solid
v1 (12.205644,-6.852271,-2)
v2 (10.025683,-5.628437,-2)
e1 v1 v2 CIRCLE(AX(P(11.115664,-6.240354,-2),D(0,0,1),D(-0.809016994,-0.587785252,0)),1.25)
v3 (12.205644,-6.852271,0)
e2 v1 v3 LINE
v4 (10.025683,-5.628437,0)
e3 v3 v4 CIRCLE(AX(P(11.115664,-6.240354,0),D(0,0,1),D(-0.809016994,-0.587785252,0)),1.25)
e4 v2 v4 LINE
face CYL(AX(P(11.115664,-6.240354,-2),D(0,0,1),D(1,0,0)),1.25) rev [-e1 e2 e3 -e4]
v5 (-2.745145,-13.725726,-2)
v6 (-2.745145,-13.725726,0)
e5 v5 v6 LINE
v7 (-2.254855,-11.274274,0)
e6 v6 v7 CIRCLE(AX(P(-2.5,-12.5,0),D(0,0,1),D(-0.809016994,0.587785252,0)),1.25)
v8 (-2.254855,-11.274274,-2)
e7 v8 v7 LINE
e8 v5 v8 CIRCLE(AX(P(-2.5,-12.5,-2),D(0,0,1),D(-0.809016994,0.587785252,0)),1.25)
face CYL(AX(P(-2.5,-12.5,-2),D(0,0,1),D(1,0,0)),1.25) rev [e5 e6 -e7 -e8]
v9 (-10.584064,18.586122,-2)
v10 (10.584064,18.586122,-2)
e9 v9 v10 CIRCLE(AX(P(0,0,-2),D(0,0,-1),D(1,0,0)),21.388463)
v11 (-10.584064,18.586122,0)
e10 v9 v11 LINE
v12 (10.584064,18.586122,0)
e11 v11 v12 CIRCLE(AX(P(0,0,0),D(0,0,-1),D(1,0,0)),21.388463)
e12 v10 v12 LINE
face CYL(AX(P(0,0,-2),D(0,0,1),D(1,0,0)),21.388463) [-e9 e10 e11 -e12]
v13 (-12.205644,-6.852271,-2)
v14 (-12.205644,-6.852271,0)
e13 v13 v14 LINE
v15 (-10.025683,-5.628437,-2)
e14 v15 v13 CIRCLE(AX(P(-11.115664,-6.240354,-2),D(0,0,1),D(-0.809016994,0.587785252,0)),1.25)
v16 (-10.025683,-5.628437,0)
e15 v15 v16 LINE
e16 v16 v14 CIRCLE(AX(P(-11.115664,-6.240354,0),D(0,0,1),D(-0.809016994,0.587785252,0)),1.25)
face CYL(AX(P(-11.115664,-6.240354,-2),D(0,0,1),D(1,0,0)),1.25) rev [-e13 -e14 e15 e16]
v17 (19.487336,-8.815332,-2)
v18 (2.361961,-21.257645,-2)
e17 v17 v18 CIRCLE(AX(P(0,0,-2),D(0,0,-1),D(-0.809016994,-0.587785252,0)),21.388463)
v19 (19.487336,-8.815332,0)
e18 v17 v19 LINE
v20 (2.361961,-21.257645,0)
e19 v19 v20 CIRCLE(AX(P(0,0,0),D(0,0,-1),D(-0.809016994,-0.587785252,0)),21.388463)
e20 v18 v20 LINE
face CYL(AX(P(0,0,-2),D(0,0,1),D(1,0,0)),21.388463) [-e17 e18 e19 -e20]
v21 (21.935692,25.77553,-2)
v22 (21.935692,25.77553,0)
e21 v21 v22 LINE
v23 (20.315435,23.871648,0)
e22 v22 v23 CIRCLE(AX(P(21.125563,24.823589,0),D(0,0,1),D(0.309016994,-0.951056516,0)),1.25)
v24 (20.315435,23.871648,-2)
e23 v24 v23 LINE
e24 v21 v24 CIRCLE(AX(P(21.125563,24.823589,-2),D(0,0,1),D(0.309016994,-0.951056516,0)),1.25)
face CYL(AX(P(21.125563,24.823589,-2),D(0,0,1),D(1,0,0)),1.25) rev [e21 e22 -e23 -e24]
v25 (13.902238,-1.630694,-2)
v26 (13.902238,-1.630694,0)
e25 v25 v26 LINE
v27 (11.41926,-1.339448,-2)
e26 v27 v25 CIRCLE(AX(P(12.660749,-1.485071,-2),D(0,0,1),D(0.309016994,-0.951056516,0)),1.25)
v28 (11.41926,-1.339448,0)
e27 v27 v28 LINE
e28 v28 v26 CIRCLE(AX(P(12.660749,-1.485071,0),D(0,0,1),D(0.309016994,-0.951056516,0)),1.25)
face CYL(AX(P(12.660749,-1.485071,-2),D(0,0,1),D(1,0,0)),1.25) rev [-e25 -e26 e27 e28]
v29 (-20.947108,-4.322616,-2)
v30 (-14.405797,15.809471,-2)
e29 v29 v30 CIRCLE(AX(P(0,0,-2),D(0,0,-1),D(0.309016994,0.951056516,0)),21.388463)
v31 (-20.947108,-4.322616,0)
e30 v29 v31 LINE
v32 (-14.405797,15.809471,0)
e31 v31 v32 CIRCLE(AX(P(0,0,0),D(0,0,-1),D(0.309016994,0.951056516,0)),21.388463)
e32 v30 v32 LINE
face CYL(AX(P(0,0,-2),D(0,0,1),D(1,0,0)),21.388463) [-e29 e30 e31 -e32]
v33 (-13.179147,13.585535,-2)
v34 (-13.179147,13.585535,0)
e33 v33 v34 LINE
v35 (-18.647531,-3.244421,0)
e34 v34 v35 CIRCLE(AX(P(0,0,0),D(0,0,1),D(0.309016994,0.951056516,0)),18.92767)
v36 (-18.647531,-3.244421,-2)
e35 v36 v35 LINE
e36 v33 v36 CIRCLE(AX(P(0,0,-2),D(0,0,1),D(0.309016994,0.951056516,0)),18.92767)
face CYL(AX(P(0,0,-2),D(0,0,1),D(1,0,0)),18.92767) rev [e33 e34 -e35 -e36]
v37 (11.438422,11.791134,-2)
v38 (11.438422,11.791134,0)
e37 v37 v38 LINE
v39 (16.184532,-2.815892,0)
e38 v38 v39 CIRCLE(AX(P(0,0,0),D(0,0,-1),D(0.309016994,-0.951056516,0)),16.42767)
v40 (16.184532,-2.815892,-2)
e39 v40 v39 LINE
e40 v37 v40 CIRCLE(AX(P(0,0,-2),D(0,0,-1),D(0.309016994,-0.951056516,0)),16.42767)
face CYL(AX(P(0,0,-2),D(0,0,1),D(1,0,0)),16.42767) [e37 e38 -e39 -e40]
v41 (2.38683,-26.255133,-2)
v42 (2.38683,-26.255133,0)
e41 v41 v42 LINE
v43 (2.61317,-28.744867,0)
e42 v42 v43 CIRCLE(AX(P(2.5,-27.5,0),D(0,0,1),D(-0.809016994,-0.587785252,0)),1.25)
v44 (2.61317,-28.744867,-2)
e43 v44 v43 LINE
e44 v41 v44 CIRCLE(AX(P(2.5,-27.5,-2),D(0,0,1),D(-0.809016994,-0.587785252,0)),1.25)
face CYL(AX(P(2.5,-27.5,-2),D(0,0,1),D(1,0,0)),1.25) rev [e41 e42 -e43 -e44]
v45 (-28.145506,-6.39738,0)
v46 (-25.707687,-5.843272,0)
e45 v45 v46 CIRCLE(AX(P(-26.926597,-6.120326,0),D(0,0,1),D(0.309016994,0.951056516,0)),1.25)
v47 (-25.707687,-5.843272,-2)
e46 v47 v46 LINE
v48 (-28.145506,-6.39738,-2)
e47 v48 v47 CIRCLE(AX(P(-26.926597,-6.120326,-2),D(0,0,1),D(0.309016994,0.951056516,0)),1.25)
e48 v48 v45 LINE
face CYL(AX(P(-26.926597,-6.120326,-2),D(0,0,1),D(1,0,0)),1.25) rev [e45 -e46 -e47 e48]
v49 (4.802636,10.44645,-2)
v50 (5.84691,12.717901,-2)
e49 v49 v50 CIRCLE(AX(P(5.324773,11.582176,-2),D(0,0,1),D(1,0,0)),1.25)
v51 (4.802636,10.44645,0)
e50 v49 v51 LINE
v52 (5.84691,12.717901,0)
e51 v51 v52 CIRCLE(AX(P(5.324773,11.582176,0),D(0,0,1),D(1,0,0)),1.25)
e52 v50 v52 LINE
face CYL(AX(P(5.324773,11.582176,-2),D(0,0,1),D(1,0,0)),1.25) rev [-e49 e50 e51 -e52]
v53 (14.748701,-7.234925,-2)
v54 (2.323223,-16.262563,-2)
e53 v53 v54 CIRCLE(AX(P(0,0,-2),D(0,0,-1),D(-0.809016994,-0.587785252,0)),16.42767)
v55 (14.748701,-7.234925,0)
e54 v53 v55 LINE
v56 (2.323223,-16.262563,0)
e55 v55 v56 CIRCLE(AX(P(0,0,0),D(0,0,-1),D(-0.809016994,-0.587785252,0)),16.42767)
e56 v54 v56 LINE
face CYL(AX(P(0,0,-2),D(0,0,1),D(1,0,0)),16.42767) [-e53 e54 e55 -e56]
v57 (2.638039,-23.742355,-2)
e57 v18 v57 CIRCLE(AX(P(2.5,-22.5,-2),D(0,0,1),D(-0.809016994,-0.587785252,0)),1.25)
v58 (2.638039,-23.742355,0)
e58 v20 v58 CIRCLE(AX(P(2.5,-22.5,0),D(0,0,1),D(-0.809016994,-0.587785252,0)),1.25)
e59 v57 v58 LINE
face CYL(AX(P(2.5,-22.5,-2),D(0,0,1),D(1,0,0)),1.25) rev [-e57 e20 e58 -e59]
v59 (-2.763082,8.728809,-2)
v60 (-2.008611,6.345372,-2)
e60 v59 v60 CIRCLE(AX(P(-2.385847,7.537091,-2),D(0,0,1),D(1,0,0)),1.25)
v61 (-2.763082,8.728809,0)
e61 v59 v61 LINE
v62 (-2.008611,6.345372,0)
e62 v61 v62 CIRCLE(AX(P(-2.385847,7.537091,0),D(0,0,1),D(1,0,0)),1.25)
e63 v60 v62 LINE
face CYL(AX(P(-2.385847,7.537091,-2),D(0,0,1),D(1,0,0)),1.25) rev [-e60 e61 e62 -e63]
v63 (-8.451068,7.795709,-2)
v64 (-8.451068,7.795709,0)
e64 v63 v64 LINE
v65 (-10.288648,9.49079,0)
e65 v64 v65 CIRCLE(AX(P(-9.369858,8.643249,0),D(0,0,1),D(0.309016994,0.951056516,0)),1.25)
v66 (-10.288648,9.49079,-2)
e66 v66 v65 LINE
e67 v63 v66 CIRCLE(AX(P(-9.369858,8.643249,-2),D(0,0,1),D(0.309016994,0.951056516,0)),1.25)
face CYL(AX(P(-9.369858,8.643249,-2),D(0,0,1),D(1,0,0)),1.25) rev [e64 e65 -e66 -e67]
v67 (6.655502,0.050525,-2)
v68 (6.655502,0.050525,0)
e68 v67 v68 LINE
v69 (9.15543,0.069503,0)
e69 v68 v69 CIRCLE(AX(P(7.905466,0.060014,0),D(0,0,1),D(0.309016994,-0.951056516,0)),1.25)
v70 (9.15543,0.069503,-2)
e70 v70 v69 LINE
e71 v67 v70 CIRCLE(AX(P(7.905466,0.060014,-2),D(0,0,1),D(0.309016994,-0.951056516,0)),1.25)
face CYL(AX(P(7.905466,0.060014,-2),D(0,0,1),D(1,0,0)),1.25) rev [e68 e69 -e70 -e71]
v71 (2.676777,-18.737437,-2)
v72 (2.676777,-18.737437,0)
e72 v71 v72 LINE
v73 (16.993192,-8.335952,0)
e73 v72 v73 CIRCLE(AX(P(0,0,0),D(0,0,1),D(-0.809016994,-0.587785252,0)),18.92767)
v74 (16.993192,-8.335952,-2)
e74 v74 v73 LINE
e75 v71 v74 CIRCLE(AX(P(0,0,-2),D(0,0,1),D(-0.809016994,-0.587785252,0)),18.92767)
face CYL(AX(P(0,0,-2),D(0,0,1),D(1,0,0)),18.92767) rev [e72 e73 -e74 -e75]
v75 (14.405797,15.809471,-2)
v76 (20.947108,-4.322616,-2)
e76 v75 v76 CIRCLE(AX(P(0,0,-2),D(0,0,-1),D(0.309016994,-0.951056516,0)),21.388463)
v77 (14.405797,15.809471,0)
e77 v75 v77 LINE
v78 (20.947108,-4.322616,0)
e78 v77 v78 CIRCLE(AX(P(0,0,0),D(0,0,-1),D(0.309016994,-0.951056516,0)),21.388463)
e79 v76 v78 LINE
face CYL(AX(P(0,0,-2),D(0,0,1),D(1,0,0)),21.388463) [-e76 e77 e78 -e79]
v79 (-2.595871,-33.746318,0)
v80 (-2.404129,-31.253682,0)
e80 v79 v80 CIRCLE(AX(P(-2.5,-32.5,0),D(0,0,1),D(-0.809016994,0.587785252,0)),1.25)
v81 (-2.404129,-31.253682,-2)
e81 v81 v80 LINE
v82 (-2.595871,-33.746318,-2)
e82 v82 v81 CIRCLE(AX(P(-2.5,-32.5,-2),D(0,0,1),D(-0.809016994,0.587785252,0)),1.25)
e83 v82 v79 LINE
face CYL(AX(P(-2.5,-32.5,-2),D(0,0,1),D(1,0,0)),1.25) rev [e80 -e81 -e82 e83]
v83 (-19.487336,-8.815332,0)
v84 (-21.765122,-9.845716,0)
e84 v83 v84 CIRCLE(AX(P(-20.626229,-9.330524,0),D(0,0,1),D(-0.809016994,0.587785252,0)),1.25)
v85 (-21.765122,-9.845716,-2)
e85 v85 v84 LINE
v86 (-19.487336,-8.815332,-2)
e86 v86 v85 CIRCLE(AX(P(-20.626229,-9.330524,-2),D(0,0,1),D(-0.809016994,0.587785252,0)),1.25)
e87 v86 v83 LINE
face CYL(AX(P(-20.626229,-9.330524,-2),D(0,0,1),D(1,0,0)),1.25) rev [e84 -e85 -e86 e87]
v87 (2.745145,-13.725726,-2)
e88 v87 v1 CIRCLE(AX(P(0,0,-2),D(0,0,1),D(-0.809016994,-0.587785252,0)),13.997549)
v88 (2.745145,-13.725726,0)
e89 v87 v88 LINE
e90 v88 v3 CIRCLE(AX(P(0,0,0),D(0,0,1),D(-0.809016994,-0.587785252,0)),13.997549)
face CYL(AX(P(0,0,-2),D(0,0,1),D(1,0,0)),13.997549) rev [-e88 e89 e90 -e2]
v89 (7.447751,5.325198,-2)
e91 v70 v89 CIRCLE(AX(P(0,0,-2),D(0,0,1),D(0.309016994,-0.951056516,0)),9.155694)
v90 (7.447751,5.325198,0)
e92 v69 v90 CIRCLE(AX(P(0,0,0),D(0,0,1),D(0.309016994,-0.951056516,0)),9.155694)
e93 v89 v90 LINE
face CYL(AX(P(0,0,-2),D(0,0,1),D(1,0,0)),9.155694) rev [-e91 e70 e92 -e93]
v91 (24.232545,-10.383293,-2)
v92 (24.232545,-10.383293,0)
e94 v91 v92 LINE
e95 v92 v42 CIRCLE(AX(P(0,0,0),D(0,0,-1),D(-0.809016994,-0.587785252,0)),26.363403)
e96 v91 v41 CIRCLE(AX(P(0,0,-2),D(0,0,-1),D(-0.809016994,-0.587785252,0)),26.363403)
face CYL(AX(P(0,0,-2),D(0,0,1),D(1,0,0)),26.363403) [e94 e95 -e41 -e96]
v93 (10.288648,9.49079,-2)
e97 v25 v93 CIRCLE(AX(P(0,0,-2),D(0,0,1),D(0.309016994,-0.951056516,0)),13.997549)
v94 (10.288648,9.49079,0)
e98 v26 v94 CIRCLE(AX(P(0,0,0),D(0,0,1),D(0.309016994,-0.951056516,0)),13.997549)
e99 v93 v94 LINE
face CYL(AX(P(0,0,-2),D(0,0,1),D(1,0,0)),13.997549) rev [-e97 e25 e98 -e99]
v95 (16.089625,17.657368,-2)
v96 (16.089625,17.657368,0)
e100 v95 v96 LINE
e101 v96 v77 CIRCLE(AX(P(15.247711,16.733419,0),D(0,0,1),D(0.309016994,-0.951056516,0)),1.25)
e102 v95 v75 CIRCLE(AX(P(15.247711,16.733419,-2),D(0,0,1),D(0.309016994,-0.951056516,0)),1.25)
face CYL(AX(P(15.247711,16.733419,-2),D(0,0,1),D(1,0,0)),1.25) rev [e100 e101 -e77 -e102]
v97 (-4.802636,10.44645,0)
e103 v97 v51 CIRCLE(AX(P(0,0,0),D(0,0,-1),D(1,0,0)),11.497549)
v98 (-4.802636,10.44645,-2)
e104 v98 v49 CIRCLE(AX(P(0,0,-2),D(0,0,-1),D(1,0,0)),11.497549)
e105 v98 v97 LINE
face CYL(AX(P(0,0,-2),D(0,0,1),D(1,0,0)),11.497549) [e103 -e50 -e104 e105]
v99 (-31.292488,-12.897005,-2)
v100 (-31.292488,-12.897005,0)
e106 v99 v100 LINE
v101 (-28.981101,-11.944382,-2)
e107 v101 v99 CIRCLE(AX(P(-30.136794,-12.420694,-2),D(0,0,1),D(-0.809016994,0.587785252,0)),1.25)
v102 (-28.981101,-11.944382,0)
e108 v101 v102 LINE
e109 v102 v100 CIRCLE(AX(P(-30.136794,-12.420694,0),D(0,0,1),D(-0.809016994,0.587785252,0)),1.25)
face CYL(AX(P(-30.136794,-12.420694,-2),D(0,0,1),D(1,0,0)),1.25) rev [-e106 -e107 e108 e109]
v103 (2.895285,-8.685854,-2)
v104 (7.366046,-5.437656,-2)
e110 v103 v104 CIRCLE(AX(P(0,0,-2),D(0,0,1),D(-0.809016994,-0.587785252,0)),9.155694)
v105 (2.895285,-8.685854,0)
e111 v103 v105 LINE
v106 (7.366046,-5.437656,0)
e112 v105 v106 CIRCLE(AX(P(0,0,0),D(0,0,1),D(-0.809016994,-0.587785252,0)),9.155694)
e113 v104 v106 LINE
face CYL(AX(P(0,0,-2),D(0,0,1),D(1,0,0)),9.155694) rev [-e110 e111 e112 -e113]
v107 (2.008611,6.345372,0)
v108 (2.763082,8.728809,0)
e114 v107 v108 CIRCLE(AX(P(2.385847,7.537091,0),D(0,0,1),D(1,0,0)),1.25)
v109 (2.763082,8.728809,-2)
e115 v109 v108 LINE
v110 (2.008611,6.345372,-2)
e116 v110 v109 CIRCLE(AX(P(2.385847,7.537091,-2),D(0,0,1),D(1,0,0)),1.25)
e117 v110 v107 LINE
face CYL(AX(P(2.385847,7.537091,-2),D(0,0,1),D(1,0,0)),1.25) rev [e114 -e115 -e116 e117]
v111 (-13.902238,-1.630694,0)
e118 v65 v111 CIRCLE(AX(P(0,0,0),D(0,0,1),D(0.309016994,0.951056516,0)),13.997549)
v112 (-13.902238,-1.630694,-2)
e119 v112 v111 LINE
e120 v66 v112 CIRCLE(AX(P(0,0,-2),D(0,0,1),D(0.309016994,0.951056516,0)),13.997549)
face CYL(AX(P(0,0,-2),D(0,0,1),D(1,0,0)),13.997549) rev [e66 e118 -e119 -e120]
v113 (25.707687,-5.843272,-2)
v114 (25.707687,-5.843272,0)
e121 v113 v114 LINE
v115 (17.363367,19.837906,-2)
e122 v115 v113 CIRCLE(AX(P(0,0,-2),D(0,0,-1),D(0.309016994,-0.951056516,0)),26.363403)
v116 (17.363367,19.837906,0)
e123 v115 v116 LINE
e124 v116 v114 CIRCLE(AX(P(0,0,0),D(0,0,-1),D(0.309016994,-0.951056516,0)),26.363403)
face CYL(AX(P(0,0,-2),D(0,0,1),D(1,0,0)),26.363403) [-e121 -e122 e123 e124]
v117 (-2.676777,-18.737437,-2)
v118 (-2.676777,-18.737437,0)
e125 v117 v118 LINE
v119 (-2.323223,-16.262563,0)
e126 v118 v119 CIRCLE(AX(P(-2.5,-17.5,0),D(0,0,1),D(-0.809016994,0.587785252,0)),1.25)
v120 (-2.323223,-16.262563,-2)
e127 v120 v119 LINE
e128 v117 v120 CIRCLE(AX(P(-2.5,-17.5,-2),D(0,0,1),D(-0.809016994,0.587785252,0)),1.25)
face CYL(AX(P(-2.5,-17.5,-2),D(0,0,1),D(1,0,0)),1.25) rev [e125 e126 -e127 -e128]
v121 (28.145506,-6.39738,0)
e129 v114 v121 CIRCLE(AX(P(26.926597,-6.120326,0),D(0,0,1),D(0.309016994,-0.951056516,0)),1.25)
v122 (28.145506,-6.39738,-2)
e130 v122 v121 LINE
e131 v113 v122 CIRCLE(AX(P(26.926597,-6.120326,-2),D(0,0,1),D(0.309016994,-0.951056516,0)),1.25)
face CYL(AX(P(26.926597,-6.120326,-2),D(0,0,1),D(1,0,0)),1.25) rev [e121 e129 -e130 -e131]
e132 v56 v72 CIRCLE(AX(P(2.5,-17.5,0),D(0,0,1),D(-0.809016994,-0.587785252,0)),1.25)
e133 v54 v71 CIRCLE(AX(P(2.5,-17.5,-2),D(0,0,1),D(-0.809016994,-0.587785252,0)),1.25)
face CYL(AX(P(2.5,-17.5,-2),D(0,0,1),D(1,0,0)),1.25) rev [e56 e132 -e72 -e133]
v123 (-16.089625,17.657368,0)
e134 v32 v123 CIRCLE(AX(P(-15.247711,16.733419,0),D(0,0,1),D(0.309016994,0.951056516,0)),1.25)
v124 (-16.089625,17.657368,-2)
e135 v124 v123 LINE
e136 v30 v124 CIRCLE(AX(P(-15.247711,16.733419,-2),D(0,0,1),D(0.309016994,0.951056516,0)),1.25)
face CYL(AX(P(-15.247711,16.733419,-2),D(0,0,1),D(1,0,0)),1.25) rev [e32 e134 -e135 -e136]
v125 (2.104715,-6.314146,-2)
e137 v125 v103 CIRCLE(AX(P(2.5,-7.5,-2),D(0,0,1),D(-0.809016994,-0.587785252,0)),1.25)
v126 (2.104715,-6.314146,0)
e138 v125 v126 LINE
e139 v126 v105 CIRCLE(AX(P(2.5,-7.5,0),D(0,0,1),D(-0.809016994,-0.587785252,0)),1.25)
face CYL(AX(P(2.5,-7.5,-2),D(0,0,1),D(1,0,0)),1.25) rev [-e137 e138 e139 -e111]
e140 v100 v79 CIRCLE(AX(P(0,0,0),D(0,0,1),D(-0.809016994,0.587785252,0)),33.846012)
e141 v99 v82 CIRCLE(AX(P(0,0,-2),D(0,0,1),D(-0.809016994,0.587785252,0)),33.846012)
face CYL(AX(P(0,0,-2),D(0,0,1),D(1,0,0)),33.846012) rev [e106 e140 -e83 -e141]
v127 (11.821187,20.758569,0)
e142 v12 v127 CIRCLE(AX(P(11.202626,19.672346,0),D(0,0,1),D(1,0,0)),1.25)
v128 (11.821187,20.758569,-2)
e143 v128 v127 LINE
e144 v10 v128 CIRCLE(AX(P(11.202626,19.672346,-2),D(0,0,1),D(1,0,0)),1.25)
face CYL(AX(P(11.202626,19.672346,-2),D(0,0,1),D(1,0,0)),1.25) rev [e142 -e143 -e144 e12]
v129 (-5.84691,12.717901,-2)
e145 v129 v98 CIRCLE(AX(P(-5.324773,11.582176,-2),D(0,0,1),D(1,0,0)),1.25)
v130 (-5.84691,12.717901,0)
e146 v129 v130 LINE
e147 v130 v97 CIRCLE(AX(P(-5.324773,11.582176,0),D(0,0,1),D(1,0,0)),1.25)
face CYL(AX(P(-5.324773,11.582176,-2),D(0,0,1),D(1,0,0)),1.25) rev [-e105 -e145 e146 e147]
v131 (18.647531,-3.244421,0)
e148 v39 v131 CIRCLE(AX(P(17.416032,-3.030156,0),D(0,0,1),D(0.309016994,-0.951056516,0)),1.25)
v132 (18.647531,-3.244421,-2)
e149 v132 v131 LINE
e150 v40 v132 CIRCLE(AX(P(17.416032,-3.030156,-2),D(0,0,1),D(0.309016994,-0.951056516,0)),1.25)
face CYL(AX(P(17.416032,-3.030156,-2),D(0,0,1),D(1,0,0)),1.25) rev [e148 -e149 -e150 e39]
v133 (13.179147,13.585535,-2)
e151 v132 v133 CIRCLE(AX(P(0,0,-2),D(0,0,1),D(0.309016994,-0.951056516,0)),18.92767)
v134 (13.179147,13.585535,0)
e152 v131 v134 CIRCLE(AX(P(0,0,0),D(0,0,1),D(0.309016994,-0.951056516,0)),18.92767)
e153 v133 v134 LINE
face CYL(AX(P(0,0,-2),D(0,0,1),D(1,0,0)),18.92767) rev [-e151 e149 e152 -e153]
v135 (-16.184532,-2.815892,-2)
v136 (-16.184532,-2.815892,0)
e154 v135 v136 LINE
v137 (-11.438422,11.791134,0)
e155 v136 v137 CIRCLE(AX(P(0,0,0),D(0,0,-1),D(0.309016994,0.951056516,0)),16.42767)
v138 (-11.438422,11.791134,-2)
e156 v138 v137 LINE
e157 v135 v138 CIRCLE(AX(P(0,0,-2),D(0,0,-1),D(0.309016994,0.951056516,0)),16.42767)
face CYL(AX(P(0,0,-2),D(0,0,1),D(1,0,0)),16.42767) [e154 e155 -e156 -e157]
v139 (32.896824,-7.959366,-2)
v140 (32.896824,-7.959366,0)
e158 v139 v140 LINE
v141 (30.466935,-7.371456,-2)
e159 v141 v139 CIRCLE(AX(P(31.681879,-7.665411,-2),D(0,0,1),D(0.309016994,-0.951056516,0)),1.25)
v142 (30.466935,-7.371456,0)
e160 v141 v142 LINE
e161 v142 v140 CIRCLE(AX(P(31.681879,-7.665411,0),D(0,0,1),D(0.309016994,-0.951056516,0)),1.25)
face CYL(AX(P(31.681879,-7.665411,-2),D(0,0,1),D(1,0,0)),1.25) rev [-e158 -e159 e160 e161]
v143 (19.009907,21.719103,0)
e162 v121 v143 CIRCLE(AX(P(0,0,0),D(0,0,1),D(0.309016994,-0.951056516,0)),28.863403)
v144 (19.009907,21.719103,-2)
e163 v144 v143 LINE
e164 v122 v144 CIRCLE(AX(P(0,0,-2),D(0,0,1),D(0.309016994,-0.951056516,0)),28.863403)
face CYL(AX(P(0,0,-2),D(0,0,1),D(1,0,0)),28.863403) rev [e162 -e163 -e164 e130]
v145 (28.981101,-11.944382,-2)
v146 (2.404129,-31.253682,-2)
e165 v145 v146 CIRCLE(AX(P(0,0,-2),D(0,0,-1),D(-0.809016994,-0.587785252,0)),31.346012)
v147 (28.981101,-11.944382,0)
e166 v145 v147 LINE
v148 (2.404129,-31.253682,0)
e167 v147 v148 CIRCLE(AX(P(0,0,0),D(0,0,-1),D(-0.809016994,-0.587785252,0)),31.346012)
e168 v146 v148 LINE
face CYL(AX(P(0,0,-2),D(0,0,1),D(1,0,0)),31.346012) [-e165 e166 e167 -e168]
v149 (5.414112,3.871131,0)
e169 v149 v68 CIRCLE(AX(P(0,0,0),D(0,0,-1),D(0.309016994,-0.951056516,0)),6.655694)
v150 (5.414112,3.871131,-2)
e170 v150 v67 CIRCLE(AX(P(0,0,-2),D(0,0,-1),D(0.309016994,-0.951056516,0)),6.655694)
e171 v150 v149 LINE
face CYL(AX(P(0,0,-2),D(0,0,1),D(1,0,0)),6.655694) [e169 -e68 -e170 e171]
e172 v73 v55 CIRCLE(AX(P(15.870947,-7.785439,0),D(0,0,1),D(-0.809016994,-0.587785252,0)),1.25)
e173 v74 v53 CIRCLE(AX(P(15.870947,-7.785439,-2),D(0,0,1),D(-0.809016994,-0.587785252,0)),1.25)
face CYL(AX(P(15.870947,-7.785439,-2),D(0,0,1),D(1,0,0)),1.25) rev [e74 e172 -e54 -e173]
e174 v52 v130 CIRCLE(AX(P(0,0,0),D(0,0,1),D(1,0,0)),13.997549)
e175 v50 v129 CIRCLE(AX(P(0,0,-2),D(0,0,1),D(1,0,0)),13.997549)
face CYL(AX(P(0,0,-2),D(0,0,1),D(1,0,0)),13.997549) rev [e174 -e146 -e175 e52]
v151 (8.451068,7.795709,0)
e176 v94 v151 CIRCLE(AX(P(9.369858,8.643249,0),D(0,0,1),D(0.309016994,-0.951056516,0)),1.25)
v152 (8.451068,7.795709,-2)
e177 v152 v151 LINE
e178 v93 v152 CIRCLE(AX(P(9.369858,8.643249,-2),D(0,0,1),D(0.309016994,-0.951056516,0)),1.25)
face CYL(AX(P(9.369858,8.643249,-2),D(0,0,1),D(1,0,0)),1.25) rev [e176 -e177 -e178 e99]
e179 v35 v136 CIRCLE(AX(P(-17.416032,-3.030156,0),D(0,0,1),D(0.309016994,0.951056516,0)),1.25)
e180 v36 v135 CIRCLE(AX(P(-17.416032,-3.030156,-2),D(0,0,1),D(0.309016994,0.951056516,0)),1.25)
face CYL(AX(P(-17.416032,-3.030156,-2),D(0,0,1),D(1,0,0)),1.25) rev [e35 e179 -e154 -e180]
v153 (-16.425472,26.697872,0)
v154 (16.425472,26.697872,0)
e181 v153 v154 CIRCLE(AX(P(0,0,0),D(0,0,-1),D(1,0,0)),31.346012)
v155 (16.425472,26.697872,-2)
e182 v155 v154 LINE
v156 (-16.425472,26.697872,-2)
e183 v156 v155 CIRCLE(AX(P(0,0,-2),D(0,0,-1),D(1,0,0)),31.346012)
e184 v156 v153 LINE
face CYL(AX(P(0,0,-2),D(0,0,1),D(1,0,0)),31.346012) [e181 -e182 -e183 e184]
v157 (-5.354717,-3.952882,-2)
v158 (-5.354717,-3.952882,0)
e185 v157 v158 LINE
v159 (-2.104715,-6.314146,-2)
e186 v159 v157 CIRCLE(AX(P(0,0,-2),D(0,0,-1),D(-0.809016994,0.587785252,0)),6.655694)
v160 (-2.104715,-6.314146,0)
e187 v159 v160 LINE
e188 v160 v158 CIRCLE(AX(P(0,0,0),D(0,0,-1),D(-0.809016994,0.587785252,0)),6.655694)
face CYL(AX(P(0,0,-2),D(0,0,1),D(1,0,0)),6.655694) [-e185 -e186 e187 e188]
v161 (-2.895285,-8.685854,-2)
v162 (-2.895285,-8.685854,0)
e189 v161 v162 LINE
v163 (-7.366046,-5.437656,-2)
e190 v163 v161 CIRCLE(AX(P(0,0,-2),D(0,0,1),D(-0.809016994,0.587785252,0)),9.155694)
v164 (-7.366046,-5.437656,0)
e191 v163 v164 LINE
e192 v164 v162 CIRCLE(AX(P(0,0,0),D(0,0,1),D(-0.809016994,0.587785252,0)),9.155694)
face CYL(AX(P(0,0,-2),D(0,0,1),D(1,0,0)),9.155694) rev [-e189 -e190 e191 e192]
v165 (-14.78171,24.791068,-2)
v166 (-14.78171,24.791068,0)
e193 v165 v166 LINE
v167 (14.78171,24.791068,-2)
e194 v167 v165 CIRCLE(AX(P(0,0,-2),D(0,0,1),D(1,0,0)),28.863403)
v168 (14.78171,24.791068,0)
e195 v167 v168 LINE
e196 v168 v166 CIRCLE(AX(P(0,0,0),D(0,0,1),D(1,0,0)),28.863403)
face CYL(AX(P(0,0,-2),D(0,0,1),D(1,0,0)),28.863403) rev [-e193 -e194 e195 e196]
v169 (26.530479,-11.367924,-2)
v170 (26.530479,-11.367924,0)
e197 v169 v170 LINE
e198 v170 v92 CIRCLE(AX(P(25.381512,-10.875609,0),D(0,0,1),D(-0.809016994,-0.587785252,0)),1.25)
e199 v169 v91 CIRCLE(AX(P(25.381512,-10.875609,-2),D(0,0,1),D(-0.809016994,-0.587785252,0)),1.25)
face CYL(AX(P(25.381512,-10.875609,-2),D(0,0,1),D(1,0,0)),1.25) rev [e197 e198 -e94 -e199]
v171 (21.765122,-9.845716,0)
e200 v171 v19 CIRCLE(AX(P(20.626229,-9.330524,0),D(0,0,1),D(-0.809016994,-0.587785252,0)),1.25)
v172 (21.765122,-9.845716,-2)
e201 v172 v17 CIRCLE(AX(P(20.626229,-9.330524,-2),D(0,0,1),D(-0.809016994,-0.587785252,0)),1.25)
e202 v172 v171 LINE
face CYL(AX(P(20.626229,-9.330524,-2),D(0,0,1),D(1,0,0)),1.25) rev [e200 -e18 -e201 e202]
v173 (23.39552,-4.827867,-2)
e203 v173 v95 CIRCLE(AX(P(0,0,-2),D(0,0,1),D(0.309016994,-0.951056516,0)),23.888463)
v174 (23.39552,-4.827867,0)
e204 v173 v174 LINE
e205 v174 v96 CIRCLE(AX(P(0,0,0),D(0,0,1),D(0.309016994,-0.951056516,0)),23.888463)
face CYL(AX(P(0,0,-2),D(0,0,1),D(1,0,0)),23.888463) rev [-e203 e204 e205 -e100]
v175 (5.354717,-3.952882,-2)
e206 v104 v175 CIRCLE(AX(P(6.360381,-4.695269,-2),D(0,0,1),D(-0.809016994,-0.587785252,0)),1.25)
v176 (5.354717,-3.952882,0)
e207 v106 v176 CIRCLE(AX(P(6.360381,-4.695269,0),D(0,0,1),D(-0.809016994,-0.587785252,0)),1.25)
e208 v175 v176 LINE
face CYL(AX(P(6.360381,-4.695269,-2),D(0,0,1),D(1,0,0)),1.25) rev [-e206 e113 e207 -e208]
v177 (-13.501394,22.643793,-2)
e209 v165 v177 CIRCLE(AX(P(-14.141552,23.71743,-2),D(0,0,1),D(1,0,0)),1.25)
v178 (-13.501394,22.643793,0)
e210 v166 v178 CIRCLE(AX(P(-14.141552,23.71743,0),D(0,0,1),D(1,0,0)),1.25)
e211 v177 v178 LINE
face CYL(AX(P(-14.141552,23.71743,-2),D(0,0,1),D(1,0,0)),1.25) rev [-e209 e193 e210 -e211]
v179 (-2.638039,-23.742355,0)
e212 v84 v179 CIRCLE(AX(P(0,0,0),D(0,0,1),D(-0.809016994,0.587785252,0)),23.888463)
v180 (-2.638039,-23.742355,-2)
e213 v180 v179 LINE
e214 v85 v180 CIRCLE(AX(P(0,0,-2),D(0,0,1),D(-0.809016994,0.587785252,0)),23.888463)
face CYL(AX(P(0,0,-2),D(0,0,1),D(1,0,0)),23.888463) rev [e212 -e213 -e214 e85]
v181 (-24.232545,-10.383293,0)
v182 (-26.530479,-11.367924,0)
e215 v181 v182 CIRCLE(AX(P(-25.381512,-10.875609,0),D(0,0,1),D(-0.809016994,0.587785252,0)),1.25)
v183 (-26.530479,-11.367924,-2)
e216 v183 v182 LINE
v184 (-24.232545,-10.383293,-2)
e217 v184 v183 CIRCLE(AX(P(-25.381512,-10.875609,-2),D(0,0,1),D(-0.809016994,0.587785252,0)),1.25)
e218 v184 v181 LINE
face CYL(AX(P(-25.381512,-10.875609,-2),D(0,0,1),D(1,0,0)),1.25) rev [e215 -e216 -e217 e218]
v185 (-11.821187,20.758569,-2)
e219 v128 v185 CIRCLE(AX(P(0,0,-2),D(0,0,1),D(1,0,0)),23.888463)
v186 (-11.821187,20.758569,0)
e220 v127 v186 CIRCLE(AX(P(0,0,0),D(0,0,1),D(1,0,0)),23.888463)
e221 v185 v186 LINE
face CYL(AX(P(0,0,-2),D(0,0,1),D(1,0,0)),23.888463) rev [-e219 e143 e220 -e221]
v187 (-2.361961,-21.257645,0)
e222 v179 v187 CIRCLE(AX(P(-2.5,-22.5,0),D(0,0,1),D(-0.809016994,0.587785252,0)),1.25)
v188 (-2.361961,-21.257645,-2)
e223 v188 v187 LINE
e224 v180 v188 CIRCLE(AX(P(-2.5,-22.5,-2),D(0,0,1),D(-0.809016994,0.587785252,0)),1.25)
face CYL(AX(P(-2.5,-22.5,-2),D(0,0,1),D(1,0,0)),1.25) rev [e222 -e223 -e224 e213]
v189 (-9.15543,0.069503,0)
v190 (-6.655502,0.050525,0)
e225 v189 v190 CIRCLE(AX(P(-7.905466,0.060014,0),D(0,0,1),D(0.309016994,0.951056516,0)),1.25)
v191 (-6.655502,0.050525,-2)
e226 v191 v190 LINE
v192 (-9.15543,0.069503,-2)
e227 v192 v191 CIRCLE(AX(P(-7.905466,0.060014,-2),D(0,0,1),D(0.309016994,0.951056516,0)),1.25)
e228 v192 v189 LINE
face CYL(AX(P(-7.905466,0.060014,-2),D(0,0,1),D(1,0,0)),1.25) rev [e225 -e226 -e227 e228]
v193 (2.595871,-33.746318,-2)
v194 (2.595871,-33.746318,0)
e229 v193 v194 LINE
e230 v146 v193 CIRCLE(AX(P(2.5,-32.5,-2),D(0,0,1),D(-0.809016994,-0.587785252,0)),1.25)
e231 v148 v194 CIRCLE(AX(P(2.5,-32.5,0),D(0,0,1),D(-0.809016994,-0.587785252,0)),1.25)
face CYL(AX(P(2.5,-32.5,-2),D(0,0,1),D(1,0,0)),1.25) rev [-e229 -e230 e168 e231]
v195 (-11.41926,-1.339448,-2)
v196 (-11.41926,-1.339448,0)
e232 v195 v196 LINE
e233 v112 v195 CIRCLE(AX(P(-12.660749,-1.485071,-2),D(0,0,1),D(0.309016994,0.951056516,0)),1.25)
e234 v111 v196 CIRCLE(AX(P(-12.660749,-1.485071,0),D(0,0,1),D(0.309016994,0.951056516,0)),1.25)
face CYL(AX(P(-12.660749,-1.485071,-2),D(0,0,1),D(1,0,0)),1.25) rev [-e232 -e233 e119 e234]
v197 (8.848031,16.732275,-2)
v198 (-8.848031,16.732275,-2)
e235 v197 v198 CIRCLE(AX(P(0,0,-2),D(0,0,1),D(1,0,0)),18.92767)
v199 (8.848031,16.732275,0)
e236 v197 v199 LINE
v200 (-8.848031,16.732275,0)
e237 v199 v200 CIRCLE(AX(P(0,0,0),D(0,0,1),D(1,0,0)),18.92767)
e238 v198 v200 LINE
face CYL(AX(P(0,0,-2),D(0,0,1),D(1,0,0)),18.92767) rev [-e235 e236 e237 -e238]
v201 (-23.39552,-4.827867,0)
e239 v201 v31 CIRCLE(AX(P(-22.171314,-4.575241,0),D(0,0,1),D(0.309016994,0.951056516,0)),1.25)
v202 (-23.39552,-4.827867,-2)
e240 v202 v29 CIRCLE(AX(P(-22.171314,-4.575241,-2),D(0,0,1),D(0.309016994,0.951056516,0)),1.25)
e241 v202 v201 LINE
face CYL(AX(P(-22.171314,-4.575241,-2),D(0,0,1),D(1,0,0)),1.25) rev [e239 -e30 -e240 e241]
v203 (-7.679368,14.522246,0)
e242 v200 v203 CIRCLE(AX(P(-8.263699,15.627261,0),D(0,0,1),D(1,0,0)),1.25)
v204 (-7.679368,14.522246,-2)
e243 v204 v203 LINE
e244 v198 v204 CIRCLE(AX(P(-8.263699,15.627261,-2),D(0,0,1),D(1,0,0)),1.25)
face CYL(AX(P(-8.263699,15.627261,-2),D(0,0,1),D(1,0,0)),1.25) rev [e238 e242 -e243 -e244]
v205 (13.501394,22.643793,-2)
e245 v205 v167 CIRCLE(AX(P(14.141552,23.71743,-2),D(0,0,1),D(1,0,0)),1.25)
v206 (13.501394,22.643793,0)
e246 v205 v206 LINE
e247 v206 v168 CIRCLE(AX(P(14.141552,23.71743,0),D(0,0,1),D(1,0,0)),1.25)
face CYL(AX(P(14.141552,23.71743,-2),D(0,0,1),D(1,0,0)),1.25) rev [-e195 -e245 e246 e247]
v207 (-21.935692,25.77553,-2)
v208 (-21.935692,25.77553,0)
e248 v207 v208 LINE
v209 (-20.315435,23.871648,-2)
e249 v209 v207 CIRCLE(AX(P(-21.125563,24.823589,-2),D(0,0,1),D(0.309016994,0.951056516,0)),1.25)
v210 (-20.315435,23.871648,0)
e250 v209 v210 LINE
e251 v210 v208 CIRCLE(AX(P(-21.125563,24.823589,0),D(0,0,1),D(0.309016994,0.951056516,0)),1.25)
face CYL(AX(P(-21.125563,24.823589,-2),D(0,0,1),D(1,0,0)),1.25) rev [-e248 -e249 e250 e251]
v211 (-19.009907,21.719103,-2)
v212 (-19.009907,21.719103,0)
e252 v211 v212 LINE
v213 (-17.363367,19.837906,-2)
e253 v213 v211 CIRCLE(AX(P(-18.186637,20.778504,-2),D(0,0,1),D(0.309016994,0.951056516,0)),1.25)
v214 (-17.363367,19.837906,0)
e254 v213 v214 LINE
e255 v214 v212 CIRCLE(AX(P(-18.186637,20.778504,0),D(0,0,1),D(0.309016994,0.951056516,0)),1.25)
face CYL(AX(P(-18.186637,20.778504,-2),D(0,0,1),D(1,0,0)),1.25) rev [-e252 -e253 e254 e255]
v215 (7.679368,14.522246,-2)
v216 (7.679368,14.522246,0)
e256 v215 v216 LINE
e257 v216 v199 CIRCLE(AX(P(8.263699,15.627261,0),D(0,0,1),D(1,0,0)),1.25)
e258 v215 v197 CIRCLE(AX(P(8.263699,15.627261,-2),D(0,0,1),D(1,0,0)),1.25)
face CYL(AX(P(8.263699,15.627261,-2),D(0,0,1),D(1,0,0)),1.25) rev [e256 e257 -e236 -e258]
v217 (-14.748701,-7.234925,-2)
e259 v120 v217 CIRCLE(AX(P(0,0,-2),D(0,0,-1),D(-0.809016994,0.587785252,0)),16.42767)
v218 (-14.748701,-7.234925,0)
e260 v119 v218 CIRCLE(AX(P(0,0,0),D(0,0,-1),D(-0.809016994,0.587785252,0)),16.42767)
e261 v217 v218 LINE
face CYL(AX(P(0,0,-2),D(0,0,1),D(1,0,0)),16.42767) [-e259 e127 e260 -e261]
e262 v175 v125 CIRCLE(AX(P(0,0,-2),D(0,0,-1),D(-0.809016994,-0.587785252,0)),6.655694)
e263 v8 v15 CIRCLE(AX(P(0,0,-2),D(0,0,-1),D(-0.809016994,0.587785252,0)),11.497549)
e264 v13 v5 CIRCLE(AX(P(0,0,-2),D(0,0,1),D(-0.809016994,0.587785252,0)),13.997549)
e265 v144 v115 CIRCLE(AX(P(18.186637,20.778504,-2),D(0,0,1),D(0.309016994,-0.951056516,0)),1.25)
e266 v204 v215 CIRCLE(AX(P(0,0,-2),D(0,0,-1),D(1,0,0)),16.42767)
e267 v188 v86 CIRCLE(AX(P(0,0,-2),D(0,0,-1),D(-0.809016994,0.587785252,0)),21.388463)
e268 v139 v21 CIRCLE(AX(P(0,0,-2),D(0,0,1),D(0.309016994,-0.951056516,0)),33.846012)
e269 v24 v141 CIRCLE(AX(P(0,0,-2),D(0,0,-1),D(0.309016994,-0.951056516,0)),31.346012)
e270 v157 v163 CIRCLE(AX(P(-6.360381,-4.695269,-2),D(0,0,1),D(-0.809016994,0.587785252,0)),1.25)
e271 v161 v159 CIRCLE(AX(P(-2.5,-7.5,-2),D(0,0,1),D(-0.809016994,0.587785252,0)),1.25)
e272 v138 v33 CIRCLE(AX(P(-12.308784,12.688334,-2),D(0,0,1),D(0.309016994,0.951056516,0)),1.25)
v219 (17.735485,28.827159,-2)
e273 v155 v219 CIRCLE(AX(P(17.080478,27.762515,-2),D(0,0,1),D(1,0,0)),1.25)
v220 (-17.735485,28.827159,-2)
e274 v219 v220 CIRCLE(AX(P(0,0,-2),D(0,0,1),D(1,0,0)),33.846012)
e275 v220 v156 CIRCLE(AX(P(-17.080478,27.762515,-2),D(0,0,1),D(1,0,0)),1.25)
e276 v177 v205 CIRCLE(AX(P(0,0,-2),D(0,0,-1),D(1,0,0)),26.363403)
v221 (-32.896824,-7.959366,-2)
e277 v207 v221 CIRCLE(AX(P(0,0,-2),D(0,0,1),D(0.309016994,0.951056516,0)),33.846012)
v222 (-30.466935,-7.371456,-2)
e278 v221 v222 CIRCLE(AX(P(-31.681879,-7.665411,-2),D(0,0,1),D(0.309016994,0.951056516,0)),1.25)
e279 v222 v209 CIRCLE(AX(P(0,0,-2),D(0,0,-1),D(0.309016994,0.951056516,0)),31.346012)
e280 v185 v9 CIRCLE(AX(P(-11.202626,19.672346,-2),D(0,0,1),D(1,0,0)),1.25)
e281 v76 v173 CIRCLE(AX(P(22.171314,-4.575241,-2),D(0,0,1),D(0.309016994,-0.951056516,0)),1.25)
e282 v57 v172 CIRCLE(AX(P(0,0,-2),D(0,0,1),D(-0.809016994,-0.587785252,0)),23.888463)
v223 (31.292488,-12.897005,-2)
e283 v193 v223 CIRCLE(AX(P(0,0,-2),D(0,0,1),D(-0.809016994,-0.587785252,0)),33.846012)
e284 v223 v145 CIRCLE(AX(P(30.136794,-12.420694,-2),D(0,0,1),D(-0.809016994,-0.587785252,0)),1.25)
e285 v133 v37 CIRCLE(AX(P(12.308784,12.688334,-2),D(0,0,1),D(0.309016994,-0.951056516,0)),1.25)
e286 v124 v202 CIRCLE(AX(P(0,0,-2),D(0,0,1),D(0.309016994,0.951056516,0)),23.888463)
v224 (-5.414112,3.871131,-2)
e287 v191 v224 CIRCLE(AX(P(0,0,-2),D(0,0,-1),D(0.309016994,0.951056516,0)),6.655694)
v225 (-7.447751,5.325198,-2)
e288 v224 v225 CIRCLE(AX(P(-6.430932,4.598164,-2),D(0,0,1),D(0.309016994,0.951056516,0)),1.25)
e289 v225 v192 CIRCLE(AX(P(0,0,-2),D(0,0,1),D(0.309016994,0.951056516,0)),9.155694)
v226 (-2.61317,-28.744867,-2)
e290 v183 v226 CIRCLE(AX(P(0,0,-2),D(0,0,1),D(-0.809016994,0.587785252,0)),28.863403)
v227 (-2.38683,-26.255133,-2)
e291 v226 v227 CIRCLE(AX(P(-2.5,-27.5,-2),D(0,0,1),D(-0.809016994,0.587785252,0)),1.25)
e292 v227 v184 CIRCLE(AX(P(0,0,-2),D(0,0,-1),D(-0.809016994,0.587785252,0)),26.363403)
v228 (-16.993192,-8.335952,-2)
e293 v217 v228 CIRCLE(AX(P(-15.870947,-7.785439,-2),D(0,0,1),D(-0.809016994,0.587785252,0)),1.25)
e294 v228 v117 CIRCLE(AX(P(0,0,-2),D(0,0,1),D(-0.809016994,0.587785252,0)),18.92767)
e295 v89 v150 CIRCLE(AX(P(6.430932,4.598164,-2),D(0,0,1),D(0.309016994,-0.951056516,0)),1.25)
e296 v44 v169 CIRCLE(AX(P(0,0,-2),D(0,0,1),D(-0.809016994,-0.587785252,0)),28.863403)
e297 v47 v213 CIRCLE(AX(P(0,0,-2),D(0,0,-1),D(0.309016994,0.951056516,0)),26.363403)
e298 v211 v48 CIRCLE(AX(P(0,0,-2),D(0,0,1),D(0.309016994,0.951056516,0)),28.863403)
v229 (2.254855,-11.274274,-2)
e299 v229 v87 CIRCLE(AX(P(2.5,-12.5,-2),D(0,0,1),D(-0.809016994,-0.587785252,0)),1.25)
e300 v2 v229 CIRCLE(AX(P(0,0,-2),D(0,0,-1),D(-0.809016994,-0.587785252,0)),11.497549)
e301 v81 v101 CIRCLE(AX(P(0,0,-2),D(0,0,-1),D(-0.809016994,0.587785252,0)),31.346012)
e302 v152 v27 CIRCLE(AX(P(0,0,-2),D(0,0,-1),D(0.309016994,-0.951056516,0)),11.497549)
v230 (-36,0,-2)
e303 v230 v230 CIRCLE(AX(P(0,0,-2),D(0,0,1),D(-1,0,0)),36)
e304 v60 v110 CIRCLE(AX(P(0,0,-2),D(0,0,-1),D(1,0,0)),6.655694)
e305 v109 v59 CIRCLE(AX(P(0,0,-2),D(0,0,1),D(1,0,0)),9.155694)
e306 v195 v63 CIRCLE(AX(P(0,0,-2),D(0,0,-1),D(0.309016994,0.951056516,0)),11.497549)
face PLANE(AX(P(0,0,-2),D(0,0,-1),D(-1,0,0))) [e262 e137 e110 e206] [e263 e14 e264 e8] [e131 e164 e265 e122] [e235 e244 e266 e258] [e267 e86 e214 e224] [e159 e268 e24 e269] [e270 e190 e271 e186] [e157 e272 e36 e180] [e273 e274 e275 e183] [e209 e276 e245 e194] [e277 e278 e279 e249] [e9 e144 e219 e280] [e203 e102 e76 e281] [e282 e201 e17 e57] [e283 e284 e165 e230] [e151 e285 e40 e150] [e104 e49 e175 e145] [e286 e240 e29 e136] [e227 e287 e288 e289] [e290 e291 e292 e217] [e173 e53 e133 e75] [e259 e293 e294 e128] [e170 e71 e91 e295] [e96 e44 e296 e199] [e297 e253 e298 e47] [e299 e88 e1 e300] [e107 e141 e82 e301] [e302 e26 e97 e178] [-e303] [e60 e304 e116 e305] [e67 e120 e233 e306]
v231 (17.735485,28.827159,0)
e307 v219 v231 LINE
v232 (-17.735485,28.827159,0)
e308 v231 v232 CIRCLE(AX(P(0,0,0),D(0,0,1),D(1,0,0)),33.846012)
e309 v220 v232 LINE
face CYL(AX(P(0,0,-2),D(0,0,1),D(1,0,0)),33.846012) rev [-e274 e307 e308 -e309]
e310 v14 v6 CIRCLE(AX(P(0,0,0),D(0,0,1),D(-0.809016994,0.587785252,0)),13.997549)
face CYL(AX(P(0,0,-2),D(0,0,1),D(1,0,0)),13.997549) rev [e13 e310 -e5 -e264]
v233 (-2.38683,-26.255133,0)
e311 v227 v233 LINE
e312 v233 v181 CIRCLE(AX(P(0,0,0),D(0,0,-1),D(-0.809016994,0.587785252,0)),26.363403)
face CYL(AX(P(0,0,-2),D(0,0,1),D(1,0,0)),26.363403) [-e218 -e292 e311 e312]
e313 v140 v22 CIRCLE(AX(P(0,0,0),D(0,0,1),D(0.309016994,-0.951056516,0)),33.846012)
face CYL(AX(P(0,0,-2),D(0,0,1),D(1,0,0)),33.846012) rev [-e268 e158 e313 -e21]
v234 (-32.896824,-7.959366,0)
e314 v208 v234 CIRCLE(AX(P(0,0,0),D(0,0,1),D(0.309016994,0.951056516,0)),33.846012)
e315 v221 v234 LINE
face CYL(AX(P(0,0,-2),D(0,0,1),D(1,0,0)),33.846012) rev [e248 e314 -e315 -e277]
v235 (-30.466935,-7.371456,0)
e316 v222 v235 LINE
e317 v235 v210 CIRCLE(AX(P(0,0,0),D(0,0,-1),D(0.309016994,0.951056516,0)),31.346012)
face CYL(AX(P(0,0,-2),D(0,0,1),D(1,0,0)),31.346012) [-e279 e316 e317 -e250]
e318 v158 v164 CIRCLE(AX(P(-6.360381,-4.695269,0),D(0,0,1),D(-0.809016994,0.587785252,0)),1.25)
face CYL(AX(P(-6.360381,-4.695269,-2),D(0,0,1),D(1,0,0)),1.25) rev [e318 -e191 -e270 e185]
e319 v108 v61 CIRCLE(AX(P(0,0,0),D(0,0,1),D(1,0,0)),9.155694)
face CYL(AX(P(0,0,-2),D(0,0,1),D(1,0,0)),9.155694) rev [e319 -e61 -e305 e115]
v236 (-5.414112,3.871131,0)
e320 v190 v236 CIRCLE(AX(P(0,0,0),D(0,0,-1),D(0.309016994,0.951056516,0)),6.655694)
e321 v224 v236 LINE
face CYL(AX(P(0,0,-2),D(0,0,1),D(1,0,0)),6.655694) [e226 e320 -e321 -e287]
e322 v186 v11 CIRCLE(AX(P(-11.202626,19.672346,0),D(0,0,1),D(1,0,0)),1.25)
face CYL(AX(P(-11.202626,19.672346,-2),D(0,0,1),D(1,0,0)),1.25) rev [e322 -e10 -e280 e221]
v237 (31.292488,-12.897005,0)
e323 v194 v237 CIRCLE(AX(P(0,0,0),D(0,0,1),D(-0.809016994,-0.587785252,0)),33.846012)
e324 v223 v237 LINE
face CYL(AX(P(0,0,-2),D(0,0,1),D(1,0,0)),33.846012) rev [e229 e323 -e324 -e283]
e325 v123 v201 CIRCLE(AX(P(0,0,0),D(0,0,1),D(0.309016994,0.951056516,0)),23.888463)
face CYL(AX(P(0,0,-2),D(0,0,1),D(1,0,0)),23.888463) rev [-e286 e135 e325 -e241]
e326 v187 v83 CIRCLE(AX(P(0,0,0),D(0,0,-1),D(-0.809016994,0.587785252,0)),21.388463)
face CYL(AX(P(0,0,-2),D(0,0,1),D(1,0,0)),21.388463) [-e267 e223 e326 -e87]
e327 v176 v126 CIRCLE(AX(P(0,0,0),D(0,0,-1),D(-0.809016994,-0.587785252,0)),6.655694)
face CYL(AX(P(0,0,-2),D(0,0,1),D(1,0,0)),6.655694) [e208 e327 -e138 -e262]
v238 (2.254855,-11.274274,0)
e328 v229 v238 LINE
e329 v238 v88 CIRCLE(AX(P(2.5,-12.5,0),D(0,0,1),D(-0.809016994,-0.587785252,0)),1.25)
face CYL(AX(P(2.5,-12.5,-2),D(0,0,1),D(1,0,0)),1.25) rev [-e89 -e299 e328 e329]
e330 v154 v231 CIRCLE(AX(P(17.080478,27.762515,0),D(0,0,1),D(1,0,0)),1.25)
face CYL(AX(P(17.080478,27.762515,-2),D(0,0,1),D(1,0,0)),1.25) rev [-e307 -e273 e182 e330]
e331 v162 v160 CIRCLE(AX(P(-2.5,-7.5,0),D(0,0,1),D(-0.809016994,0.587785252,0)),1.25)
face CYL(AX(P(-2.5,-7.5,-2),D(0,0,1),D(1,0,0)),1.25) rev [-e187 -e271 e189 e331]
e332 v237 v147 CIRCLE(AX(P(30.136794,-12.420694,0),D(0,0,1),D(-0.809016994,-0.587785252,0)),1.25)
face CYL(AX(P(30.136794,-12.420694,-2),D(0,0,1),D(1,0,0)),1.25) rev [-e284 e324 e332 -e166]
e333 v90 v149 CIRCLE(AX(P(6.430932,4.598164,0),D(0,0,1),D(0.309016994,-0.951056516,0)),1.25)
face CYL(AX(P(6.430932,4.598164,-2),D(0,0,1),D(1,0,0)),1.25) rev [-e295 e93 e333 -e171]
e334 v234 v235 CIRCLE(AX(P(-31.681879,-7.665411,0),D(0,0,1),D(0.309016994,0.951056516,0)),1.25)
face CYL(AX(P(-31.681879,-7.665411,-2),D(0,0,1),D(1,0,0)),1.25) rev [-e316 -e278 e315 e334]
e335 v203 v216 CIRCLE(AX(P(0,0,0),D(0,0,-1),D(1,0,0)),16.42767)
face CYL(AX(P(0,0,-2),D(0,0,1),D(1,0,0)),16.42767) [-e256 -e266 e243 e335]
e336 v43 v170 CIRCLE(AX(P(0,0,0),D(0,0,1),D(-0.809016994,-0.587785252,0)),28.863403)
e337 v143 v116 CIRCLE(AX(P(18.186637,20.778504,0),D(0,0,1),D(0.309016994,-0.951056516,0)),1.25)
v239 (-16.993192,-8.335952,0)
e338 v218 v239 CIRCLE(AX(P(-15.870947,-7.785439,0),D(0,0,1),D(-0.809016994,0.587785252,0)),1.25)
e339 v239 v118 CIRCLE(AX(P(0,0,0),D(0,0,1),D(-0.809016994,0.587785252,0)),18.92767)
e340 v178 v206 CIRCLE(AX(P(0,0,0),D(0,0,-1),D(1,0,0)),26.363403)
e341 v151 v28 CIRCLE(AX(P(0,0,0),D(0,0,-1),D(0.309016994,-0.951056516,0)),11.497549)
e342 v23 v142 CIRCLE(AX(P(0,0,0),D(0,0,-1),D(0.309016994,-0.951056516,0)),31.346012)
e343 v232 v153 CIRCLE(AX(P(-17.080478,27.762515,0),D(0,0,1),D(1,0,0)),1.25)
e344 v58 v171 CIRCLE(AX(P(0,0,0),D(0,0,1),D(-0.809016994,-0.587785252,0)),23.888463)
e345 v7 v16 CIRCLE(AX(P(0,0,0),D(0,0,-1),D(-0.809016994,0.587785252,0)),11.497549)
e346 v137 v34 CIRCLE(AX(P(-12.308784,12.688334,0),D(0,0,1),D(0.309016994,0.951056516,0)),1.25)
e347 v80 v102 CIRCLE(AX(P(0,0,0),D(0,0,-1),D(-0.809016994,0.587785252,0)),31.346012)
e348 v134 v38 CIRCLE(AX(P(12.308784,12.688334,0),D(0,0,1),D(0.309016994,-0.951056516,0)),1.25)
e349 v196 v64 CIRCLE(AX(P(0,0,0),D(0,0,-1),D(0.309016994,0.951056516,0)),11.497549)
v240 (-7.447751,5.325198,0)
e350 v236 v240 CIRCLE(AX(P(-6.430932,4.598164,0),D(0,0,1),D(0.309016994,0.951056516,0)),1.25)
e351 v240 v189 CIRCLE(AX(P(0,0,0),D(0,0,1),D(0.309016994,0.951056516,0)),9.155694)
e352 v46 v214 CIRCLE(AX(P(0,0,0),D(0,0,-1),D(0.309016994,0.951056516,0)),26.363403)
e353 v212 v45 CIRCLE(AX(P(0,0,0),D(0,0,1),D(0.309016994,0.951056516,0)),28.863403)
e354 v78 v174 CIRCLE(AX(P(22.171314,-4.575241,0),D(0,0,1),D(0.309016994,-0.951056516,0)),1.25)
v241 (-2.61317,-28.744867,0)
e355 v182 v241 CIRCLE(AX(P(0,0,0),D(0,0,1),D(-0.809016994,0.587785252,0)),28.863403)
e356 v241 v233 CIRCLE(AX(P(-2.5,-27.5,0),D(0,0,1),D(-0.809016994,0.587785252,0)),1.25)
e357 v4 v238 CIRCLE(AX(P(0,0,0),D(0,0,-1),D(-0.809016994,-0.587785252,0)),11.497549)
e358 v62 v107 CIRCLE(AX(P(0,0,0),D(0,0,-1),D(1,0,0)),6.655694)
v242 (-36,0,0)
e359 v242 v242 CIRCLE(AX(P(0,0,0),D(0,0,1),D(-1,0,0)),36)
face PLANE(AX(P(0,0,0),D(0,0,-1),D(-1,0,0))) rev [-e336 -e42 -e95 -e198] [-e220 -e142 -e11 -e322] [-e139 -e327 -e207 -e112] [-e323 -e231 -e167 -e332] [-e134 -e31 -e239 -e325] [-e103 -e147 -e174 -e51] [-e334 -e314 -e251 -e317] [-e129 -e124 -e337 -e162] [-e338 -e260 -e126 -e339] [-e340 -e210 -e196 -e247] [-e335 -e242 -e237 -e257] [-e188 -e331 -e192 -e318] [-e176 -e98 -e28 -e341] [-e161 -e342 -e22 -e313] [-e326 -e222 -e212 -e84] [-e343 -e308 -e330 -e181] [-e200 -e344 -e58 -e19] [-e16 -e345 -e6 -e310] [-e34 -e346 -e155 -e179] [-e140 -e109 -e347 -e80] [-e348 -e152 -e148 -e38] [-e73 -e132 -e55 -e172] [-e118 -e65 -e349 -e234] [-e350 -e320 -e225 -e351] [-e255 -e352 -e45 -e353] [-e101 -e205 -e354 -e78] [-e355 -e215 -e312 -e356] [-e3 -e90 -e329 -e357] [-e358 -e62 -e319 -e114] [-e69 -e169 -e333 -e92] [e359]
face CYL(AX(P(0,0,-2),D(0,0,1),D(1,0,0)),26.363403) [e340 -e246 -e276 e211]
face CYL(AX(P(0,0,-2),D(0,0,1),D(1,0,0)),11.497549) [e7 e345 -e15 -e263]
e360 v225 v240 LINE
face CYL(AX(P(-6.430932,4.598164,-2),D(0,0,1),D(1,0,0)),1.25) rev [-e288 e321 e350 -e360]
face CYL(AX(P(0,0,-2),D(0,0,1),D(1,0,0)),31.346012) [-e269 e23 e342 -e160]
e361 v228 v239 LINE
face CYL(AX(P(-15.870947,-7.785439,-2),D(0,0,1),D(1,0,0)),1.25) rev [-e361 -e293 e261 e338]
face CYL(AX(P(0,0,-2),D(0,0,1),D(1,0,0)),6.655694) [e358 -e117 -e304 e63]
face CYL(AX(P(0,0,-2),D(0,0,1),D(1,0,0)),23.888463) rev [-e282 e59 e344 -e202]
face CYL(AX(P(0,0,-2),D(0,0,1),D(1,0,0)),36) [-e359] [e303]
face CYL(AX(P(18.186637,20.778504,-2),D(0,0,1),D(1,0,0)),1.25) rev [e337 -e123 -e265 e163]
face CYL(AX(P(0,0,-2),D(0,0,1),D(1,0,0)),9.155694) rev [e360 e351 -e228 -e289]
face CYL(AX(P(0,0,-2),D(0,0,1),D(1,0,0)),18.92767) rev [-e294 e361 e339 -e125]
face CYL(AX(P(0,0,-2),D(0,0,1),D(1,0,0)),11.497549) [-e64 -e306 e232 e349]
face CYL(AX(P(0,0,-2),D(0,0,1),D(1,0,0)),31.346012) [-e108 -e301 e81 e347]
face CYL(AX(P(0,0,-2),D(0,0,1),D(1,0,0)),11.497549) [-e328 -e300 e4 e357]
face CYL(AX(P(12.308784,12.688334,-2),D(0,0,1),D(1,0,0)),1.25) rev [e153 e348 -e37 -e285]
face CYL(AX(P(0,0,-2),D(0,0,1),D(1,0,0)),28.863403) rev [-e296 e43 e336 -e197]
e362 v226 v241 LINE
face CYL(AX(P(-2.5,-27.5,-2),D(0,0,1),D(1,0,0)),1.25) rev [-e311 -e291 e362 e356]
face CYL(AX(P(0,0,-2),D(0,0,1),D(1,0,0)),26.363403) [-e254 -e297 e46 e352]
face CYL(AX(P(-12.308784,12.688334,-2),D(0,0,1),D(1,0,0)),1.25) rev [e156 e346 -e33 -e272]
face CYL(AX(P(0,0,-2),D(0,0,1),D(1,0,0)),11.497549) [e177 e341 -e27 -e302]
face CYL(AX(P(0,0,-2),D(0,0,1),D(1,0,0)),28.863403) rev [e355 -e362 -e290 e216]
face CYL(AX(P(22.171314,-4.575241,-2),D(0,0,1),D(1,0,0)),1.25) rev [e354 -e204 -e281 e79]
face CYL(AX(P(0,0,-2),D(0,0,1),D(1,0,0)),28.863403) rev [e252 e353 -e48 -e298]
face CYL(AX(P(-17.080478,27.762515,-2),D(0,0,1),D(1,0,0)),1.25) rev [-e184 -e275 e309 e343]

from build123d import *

# Parameters (mm, degrees)
EXTRUDE_2_DEPTH          = 2
CUT_EXTRUDE_5_DEPTH      = 42.806183605
PATTERN_START            = -2
PATTERN_LINEAR_6_DEPTH   = 2
PATTERN_CIRCULAR_2_COUNT = 5


# Read off the part's stored shape, not the designer's step: Линейный массив6
with BuildPart() as part:
    # Эскиз6 → Бобышка-Вытянуть2 (new body)
    with BuildSketch(Plane.XY):
        with BuildLine():
            Line((0, 0), (-21.160269083, 29.124611797))
            ThreePointArc((-21.160269083, 29.124611797), (0, 36), (21.160269083, 29.124611797))
            Line((21.160269083, 29.124611797), (0, 0))
        make_face()
    extrude_2 = extrude(amount=-EXTRUDE_2_DEPTH)

    # Эскиз8 → Вырез-Вытянуть5 (cut, through all)
    with BuildSketch(Plane.XY):
        with BuildLine():
            ThreePointArc((2.763082425, 8.728809248), (0, 9.15569415), (-2.763082425, 8.728809248))
            ThreePointArc((-2.763082425, 8.728809248), (-3.577565566, 7.15985507), (-2.008611388, 6.345371929))
            ThreePointArc((-2.008611388, 6.345371929), (0, 6.65569415), (2.008611388, 6.345371929))
            ThreePointArc((2.008611388, 6.345371929), (3.577565566, 7.15985507), (2.763082425, 8.728809248))
        make_face()
    cut_extrude_5 = extrude(amount=-CUT_EXTRUDE_5_DEPTH, mode=Mode.SUBTRACT)

    # Линейный массив6 outline → Линейный массив6 (cut)
    with BuildSketch(Plane.XY.offset(PATTERN_START)):
        with BuildLine():
            ThreePointArc((-10.584064165, 18.586121936), (0, 21.388462845), (10.584064165, 18.586121936))
            ThreePointArc((10.584064165, 18.586121936), (12.288849258, 19.053783979), (11.821187216, 20.758569072))
            ThreePointArc((11.821187216, 20.758569072), (0, 23.888462845), (-11.821187216, 20.758569072))
            ThreePointArc((-11.821187216, 20.758569072), (-12.288849258, 19.053783979), (-10.584064165, 18.586121936))
        make_face()
        with BuildLine():
            ThreePointArc((-7.679367639, 14.522246343), (0, 16.42766953), (7.679367639, 14.522246343))
            ThreePointArc((7.679367639, 14.522246343), (9.368713619, 15.042928742), (8.84803122, 16.732274722))
            ThreePointArc((8.84803122, 16.732274722), (0, 18.92766953), (-8.84803122, 16.732274722))
            ThreePointArc((-8.84803122, 16.732274722), (-9.368713619, 15.042928742), (-7.679367639, 14.522246343))
        make_face()
        with BuildLine():
            ThreePointArc((-16.425471774, 26.69787158), (0, 31.346012026), (16.425471774, 26.69787158))
            ThreePointArc((16.425471774, 26.69787158), (18.145122081, 27.107509008), (17.735484653, 28.827159315))
            ThreePointArc((17.735484653, 28.827159315), (0, 33.846012026), (-17.735484653, 28.827159315))
            ThreePointArc((-17.735484653, 28.827159315), (-18.145122081, 27.107509008), (-16.425471774, 26.69787158))
        make_face()
        with BuildLine():
            ThreePointArc((-13.501393974, 22.643792845), (0, 26.363402543), (13.501393974, 22.643792845))
            ThreePointArc((13.501393974, 22.643792845), (15.215189583, 23.077272498), (14.78170993, 24.791068107))
            ThreePointArc((14.78170993, 24.791068107), (0, 28.863402543), (-14.78170993, 24.791068107))
            ThreePointArc((-14.78170993, 24.791068107), (-15.215189583, 23.077272498), (-13.501393974, 22.643792845))
        make_face()
        with BuildLine():
            ThreePointArc((-4.802636201, 10.446449807), (0, 11.497548784), (4.802636201, 10.446449807))
            ThreePointArc((4.802636201, 10.446449807), (6.460498921, 11.060038594), (5.846910135, 12.717901314))
            ThreePointArc((5.846910135, 12.717901314), (0, 13.997548784), (-5.846910135, 12.717901314))
            ThreePointArc((-5.846910135, 12.717901314), (-6.460498921, 11.060038594), (-4.802636201, 10.446449807))
        make_face()
    pattern_linear_6 = extrude(amount=PATTERN_LINEAR_6_DEPTH, mode=Mode.SUBTRACT)

    # Круговой массив2: Бобышка-Вытянуть2, Вырез-Вытянуть5, Линейный массив6 ×5 about axis
    pattern_circular_2_axis = Axis((0, 0, 0), (0, 0, 1))
    add([extrude_2.rotate(pattern_circular_2_axis, i * 360 / PATTERN_CIRCULAR_2_COUNT) for i in range(1, PATTERN_CIRCULAR_2_COUNT)])
    add([cut_extrude_5.rotate(pattern_circular_2_axis, i * 360 / PATTERN_CIRCULAR_2_COUNT) for i in range(1, PATTERN_CIRCULAR_2_COUNT)], mode=Mode.SUBTRACT)
    add([pattern_linear_6.rotate(pattern_circular_2_axis, i * 360 / PATTERN_CIRCULAR_2_COUNT) for i in range(1, PATTERN_CIRCULAR_2_COUNT)], mode=Mode.SUBTRACT)


solid = part.part
